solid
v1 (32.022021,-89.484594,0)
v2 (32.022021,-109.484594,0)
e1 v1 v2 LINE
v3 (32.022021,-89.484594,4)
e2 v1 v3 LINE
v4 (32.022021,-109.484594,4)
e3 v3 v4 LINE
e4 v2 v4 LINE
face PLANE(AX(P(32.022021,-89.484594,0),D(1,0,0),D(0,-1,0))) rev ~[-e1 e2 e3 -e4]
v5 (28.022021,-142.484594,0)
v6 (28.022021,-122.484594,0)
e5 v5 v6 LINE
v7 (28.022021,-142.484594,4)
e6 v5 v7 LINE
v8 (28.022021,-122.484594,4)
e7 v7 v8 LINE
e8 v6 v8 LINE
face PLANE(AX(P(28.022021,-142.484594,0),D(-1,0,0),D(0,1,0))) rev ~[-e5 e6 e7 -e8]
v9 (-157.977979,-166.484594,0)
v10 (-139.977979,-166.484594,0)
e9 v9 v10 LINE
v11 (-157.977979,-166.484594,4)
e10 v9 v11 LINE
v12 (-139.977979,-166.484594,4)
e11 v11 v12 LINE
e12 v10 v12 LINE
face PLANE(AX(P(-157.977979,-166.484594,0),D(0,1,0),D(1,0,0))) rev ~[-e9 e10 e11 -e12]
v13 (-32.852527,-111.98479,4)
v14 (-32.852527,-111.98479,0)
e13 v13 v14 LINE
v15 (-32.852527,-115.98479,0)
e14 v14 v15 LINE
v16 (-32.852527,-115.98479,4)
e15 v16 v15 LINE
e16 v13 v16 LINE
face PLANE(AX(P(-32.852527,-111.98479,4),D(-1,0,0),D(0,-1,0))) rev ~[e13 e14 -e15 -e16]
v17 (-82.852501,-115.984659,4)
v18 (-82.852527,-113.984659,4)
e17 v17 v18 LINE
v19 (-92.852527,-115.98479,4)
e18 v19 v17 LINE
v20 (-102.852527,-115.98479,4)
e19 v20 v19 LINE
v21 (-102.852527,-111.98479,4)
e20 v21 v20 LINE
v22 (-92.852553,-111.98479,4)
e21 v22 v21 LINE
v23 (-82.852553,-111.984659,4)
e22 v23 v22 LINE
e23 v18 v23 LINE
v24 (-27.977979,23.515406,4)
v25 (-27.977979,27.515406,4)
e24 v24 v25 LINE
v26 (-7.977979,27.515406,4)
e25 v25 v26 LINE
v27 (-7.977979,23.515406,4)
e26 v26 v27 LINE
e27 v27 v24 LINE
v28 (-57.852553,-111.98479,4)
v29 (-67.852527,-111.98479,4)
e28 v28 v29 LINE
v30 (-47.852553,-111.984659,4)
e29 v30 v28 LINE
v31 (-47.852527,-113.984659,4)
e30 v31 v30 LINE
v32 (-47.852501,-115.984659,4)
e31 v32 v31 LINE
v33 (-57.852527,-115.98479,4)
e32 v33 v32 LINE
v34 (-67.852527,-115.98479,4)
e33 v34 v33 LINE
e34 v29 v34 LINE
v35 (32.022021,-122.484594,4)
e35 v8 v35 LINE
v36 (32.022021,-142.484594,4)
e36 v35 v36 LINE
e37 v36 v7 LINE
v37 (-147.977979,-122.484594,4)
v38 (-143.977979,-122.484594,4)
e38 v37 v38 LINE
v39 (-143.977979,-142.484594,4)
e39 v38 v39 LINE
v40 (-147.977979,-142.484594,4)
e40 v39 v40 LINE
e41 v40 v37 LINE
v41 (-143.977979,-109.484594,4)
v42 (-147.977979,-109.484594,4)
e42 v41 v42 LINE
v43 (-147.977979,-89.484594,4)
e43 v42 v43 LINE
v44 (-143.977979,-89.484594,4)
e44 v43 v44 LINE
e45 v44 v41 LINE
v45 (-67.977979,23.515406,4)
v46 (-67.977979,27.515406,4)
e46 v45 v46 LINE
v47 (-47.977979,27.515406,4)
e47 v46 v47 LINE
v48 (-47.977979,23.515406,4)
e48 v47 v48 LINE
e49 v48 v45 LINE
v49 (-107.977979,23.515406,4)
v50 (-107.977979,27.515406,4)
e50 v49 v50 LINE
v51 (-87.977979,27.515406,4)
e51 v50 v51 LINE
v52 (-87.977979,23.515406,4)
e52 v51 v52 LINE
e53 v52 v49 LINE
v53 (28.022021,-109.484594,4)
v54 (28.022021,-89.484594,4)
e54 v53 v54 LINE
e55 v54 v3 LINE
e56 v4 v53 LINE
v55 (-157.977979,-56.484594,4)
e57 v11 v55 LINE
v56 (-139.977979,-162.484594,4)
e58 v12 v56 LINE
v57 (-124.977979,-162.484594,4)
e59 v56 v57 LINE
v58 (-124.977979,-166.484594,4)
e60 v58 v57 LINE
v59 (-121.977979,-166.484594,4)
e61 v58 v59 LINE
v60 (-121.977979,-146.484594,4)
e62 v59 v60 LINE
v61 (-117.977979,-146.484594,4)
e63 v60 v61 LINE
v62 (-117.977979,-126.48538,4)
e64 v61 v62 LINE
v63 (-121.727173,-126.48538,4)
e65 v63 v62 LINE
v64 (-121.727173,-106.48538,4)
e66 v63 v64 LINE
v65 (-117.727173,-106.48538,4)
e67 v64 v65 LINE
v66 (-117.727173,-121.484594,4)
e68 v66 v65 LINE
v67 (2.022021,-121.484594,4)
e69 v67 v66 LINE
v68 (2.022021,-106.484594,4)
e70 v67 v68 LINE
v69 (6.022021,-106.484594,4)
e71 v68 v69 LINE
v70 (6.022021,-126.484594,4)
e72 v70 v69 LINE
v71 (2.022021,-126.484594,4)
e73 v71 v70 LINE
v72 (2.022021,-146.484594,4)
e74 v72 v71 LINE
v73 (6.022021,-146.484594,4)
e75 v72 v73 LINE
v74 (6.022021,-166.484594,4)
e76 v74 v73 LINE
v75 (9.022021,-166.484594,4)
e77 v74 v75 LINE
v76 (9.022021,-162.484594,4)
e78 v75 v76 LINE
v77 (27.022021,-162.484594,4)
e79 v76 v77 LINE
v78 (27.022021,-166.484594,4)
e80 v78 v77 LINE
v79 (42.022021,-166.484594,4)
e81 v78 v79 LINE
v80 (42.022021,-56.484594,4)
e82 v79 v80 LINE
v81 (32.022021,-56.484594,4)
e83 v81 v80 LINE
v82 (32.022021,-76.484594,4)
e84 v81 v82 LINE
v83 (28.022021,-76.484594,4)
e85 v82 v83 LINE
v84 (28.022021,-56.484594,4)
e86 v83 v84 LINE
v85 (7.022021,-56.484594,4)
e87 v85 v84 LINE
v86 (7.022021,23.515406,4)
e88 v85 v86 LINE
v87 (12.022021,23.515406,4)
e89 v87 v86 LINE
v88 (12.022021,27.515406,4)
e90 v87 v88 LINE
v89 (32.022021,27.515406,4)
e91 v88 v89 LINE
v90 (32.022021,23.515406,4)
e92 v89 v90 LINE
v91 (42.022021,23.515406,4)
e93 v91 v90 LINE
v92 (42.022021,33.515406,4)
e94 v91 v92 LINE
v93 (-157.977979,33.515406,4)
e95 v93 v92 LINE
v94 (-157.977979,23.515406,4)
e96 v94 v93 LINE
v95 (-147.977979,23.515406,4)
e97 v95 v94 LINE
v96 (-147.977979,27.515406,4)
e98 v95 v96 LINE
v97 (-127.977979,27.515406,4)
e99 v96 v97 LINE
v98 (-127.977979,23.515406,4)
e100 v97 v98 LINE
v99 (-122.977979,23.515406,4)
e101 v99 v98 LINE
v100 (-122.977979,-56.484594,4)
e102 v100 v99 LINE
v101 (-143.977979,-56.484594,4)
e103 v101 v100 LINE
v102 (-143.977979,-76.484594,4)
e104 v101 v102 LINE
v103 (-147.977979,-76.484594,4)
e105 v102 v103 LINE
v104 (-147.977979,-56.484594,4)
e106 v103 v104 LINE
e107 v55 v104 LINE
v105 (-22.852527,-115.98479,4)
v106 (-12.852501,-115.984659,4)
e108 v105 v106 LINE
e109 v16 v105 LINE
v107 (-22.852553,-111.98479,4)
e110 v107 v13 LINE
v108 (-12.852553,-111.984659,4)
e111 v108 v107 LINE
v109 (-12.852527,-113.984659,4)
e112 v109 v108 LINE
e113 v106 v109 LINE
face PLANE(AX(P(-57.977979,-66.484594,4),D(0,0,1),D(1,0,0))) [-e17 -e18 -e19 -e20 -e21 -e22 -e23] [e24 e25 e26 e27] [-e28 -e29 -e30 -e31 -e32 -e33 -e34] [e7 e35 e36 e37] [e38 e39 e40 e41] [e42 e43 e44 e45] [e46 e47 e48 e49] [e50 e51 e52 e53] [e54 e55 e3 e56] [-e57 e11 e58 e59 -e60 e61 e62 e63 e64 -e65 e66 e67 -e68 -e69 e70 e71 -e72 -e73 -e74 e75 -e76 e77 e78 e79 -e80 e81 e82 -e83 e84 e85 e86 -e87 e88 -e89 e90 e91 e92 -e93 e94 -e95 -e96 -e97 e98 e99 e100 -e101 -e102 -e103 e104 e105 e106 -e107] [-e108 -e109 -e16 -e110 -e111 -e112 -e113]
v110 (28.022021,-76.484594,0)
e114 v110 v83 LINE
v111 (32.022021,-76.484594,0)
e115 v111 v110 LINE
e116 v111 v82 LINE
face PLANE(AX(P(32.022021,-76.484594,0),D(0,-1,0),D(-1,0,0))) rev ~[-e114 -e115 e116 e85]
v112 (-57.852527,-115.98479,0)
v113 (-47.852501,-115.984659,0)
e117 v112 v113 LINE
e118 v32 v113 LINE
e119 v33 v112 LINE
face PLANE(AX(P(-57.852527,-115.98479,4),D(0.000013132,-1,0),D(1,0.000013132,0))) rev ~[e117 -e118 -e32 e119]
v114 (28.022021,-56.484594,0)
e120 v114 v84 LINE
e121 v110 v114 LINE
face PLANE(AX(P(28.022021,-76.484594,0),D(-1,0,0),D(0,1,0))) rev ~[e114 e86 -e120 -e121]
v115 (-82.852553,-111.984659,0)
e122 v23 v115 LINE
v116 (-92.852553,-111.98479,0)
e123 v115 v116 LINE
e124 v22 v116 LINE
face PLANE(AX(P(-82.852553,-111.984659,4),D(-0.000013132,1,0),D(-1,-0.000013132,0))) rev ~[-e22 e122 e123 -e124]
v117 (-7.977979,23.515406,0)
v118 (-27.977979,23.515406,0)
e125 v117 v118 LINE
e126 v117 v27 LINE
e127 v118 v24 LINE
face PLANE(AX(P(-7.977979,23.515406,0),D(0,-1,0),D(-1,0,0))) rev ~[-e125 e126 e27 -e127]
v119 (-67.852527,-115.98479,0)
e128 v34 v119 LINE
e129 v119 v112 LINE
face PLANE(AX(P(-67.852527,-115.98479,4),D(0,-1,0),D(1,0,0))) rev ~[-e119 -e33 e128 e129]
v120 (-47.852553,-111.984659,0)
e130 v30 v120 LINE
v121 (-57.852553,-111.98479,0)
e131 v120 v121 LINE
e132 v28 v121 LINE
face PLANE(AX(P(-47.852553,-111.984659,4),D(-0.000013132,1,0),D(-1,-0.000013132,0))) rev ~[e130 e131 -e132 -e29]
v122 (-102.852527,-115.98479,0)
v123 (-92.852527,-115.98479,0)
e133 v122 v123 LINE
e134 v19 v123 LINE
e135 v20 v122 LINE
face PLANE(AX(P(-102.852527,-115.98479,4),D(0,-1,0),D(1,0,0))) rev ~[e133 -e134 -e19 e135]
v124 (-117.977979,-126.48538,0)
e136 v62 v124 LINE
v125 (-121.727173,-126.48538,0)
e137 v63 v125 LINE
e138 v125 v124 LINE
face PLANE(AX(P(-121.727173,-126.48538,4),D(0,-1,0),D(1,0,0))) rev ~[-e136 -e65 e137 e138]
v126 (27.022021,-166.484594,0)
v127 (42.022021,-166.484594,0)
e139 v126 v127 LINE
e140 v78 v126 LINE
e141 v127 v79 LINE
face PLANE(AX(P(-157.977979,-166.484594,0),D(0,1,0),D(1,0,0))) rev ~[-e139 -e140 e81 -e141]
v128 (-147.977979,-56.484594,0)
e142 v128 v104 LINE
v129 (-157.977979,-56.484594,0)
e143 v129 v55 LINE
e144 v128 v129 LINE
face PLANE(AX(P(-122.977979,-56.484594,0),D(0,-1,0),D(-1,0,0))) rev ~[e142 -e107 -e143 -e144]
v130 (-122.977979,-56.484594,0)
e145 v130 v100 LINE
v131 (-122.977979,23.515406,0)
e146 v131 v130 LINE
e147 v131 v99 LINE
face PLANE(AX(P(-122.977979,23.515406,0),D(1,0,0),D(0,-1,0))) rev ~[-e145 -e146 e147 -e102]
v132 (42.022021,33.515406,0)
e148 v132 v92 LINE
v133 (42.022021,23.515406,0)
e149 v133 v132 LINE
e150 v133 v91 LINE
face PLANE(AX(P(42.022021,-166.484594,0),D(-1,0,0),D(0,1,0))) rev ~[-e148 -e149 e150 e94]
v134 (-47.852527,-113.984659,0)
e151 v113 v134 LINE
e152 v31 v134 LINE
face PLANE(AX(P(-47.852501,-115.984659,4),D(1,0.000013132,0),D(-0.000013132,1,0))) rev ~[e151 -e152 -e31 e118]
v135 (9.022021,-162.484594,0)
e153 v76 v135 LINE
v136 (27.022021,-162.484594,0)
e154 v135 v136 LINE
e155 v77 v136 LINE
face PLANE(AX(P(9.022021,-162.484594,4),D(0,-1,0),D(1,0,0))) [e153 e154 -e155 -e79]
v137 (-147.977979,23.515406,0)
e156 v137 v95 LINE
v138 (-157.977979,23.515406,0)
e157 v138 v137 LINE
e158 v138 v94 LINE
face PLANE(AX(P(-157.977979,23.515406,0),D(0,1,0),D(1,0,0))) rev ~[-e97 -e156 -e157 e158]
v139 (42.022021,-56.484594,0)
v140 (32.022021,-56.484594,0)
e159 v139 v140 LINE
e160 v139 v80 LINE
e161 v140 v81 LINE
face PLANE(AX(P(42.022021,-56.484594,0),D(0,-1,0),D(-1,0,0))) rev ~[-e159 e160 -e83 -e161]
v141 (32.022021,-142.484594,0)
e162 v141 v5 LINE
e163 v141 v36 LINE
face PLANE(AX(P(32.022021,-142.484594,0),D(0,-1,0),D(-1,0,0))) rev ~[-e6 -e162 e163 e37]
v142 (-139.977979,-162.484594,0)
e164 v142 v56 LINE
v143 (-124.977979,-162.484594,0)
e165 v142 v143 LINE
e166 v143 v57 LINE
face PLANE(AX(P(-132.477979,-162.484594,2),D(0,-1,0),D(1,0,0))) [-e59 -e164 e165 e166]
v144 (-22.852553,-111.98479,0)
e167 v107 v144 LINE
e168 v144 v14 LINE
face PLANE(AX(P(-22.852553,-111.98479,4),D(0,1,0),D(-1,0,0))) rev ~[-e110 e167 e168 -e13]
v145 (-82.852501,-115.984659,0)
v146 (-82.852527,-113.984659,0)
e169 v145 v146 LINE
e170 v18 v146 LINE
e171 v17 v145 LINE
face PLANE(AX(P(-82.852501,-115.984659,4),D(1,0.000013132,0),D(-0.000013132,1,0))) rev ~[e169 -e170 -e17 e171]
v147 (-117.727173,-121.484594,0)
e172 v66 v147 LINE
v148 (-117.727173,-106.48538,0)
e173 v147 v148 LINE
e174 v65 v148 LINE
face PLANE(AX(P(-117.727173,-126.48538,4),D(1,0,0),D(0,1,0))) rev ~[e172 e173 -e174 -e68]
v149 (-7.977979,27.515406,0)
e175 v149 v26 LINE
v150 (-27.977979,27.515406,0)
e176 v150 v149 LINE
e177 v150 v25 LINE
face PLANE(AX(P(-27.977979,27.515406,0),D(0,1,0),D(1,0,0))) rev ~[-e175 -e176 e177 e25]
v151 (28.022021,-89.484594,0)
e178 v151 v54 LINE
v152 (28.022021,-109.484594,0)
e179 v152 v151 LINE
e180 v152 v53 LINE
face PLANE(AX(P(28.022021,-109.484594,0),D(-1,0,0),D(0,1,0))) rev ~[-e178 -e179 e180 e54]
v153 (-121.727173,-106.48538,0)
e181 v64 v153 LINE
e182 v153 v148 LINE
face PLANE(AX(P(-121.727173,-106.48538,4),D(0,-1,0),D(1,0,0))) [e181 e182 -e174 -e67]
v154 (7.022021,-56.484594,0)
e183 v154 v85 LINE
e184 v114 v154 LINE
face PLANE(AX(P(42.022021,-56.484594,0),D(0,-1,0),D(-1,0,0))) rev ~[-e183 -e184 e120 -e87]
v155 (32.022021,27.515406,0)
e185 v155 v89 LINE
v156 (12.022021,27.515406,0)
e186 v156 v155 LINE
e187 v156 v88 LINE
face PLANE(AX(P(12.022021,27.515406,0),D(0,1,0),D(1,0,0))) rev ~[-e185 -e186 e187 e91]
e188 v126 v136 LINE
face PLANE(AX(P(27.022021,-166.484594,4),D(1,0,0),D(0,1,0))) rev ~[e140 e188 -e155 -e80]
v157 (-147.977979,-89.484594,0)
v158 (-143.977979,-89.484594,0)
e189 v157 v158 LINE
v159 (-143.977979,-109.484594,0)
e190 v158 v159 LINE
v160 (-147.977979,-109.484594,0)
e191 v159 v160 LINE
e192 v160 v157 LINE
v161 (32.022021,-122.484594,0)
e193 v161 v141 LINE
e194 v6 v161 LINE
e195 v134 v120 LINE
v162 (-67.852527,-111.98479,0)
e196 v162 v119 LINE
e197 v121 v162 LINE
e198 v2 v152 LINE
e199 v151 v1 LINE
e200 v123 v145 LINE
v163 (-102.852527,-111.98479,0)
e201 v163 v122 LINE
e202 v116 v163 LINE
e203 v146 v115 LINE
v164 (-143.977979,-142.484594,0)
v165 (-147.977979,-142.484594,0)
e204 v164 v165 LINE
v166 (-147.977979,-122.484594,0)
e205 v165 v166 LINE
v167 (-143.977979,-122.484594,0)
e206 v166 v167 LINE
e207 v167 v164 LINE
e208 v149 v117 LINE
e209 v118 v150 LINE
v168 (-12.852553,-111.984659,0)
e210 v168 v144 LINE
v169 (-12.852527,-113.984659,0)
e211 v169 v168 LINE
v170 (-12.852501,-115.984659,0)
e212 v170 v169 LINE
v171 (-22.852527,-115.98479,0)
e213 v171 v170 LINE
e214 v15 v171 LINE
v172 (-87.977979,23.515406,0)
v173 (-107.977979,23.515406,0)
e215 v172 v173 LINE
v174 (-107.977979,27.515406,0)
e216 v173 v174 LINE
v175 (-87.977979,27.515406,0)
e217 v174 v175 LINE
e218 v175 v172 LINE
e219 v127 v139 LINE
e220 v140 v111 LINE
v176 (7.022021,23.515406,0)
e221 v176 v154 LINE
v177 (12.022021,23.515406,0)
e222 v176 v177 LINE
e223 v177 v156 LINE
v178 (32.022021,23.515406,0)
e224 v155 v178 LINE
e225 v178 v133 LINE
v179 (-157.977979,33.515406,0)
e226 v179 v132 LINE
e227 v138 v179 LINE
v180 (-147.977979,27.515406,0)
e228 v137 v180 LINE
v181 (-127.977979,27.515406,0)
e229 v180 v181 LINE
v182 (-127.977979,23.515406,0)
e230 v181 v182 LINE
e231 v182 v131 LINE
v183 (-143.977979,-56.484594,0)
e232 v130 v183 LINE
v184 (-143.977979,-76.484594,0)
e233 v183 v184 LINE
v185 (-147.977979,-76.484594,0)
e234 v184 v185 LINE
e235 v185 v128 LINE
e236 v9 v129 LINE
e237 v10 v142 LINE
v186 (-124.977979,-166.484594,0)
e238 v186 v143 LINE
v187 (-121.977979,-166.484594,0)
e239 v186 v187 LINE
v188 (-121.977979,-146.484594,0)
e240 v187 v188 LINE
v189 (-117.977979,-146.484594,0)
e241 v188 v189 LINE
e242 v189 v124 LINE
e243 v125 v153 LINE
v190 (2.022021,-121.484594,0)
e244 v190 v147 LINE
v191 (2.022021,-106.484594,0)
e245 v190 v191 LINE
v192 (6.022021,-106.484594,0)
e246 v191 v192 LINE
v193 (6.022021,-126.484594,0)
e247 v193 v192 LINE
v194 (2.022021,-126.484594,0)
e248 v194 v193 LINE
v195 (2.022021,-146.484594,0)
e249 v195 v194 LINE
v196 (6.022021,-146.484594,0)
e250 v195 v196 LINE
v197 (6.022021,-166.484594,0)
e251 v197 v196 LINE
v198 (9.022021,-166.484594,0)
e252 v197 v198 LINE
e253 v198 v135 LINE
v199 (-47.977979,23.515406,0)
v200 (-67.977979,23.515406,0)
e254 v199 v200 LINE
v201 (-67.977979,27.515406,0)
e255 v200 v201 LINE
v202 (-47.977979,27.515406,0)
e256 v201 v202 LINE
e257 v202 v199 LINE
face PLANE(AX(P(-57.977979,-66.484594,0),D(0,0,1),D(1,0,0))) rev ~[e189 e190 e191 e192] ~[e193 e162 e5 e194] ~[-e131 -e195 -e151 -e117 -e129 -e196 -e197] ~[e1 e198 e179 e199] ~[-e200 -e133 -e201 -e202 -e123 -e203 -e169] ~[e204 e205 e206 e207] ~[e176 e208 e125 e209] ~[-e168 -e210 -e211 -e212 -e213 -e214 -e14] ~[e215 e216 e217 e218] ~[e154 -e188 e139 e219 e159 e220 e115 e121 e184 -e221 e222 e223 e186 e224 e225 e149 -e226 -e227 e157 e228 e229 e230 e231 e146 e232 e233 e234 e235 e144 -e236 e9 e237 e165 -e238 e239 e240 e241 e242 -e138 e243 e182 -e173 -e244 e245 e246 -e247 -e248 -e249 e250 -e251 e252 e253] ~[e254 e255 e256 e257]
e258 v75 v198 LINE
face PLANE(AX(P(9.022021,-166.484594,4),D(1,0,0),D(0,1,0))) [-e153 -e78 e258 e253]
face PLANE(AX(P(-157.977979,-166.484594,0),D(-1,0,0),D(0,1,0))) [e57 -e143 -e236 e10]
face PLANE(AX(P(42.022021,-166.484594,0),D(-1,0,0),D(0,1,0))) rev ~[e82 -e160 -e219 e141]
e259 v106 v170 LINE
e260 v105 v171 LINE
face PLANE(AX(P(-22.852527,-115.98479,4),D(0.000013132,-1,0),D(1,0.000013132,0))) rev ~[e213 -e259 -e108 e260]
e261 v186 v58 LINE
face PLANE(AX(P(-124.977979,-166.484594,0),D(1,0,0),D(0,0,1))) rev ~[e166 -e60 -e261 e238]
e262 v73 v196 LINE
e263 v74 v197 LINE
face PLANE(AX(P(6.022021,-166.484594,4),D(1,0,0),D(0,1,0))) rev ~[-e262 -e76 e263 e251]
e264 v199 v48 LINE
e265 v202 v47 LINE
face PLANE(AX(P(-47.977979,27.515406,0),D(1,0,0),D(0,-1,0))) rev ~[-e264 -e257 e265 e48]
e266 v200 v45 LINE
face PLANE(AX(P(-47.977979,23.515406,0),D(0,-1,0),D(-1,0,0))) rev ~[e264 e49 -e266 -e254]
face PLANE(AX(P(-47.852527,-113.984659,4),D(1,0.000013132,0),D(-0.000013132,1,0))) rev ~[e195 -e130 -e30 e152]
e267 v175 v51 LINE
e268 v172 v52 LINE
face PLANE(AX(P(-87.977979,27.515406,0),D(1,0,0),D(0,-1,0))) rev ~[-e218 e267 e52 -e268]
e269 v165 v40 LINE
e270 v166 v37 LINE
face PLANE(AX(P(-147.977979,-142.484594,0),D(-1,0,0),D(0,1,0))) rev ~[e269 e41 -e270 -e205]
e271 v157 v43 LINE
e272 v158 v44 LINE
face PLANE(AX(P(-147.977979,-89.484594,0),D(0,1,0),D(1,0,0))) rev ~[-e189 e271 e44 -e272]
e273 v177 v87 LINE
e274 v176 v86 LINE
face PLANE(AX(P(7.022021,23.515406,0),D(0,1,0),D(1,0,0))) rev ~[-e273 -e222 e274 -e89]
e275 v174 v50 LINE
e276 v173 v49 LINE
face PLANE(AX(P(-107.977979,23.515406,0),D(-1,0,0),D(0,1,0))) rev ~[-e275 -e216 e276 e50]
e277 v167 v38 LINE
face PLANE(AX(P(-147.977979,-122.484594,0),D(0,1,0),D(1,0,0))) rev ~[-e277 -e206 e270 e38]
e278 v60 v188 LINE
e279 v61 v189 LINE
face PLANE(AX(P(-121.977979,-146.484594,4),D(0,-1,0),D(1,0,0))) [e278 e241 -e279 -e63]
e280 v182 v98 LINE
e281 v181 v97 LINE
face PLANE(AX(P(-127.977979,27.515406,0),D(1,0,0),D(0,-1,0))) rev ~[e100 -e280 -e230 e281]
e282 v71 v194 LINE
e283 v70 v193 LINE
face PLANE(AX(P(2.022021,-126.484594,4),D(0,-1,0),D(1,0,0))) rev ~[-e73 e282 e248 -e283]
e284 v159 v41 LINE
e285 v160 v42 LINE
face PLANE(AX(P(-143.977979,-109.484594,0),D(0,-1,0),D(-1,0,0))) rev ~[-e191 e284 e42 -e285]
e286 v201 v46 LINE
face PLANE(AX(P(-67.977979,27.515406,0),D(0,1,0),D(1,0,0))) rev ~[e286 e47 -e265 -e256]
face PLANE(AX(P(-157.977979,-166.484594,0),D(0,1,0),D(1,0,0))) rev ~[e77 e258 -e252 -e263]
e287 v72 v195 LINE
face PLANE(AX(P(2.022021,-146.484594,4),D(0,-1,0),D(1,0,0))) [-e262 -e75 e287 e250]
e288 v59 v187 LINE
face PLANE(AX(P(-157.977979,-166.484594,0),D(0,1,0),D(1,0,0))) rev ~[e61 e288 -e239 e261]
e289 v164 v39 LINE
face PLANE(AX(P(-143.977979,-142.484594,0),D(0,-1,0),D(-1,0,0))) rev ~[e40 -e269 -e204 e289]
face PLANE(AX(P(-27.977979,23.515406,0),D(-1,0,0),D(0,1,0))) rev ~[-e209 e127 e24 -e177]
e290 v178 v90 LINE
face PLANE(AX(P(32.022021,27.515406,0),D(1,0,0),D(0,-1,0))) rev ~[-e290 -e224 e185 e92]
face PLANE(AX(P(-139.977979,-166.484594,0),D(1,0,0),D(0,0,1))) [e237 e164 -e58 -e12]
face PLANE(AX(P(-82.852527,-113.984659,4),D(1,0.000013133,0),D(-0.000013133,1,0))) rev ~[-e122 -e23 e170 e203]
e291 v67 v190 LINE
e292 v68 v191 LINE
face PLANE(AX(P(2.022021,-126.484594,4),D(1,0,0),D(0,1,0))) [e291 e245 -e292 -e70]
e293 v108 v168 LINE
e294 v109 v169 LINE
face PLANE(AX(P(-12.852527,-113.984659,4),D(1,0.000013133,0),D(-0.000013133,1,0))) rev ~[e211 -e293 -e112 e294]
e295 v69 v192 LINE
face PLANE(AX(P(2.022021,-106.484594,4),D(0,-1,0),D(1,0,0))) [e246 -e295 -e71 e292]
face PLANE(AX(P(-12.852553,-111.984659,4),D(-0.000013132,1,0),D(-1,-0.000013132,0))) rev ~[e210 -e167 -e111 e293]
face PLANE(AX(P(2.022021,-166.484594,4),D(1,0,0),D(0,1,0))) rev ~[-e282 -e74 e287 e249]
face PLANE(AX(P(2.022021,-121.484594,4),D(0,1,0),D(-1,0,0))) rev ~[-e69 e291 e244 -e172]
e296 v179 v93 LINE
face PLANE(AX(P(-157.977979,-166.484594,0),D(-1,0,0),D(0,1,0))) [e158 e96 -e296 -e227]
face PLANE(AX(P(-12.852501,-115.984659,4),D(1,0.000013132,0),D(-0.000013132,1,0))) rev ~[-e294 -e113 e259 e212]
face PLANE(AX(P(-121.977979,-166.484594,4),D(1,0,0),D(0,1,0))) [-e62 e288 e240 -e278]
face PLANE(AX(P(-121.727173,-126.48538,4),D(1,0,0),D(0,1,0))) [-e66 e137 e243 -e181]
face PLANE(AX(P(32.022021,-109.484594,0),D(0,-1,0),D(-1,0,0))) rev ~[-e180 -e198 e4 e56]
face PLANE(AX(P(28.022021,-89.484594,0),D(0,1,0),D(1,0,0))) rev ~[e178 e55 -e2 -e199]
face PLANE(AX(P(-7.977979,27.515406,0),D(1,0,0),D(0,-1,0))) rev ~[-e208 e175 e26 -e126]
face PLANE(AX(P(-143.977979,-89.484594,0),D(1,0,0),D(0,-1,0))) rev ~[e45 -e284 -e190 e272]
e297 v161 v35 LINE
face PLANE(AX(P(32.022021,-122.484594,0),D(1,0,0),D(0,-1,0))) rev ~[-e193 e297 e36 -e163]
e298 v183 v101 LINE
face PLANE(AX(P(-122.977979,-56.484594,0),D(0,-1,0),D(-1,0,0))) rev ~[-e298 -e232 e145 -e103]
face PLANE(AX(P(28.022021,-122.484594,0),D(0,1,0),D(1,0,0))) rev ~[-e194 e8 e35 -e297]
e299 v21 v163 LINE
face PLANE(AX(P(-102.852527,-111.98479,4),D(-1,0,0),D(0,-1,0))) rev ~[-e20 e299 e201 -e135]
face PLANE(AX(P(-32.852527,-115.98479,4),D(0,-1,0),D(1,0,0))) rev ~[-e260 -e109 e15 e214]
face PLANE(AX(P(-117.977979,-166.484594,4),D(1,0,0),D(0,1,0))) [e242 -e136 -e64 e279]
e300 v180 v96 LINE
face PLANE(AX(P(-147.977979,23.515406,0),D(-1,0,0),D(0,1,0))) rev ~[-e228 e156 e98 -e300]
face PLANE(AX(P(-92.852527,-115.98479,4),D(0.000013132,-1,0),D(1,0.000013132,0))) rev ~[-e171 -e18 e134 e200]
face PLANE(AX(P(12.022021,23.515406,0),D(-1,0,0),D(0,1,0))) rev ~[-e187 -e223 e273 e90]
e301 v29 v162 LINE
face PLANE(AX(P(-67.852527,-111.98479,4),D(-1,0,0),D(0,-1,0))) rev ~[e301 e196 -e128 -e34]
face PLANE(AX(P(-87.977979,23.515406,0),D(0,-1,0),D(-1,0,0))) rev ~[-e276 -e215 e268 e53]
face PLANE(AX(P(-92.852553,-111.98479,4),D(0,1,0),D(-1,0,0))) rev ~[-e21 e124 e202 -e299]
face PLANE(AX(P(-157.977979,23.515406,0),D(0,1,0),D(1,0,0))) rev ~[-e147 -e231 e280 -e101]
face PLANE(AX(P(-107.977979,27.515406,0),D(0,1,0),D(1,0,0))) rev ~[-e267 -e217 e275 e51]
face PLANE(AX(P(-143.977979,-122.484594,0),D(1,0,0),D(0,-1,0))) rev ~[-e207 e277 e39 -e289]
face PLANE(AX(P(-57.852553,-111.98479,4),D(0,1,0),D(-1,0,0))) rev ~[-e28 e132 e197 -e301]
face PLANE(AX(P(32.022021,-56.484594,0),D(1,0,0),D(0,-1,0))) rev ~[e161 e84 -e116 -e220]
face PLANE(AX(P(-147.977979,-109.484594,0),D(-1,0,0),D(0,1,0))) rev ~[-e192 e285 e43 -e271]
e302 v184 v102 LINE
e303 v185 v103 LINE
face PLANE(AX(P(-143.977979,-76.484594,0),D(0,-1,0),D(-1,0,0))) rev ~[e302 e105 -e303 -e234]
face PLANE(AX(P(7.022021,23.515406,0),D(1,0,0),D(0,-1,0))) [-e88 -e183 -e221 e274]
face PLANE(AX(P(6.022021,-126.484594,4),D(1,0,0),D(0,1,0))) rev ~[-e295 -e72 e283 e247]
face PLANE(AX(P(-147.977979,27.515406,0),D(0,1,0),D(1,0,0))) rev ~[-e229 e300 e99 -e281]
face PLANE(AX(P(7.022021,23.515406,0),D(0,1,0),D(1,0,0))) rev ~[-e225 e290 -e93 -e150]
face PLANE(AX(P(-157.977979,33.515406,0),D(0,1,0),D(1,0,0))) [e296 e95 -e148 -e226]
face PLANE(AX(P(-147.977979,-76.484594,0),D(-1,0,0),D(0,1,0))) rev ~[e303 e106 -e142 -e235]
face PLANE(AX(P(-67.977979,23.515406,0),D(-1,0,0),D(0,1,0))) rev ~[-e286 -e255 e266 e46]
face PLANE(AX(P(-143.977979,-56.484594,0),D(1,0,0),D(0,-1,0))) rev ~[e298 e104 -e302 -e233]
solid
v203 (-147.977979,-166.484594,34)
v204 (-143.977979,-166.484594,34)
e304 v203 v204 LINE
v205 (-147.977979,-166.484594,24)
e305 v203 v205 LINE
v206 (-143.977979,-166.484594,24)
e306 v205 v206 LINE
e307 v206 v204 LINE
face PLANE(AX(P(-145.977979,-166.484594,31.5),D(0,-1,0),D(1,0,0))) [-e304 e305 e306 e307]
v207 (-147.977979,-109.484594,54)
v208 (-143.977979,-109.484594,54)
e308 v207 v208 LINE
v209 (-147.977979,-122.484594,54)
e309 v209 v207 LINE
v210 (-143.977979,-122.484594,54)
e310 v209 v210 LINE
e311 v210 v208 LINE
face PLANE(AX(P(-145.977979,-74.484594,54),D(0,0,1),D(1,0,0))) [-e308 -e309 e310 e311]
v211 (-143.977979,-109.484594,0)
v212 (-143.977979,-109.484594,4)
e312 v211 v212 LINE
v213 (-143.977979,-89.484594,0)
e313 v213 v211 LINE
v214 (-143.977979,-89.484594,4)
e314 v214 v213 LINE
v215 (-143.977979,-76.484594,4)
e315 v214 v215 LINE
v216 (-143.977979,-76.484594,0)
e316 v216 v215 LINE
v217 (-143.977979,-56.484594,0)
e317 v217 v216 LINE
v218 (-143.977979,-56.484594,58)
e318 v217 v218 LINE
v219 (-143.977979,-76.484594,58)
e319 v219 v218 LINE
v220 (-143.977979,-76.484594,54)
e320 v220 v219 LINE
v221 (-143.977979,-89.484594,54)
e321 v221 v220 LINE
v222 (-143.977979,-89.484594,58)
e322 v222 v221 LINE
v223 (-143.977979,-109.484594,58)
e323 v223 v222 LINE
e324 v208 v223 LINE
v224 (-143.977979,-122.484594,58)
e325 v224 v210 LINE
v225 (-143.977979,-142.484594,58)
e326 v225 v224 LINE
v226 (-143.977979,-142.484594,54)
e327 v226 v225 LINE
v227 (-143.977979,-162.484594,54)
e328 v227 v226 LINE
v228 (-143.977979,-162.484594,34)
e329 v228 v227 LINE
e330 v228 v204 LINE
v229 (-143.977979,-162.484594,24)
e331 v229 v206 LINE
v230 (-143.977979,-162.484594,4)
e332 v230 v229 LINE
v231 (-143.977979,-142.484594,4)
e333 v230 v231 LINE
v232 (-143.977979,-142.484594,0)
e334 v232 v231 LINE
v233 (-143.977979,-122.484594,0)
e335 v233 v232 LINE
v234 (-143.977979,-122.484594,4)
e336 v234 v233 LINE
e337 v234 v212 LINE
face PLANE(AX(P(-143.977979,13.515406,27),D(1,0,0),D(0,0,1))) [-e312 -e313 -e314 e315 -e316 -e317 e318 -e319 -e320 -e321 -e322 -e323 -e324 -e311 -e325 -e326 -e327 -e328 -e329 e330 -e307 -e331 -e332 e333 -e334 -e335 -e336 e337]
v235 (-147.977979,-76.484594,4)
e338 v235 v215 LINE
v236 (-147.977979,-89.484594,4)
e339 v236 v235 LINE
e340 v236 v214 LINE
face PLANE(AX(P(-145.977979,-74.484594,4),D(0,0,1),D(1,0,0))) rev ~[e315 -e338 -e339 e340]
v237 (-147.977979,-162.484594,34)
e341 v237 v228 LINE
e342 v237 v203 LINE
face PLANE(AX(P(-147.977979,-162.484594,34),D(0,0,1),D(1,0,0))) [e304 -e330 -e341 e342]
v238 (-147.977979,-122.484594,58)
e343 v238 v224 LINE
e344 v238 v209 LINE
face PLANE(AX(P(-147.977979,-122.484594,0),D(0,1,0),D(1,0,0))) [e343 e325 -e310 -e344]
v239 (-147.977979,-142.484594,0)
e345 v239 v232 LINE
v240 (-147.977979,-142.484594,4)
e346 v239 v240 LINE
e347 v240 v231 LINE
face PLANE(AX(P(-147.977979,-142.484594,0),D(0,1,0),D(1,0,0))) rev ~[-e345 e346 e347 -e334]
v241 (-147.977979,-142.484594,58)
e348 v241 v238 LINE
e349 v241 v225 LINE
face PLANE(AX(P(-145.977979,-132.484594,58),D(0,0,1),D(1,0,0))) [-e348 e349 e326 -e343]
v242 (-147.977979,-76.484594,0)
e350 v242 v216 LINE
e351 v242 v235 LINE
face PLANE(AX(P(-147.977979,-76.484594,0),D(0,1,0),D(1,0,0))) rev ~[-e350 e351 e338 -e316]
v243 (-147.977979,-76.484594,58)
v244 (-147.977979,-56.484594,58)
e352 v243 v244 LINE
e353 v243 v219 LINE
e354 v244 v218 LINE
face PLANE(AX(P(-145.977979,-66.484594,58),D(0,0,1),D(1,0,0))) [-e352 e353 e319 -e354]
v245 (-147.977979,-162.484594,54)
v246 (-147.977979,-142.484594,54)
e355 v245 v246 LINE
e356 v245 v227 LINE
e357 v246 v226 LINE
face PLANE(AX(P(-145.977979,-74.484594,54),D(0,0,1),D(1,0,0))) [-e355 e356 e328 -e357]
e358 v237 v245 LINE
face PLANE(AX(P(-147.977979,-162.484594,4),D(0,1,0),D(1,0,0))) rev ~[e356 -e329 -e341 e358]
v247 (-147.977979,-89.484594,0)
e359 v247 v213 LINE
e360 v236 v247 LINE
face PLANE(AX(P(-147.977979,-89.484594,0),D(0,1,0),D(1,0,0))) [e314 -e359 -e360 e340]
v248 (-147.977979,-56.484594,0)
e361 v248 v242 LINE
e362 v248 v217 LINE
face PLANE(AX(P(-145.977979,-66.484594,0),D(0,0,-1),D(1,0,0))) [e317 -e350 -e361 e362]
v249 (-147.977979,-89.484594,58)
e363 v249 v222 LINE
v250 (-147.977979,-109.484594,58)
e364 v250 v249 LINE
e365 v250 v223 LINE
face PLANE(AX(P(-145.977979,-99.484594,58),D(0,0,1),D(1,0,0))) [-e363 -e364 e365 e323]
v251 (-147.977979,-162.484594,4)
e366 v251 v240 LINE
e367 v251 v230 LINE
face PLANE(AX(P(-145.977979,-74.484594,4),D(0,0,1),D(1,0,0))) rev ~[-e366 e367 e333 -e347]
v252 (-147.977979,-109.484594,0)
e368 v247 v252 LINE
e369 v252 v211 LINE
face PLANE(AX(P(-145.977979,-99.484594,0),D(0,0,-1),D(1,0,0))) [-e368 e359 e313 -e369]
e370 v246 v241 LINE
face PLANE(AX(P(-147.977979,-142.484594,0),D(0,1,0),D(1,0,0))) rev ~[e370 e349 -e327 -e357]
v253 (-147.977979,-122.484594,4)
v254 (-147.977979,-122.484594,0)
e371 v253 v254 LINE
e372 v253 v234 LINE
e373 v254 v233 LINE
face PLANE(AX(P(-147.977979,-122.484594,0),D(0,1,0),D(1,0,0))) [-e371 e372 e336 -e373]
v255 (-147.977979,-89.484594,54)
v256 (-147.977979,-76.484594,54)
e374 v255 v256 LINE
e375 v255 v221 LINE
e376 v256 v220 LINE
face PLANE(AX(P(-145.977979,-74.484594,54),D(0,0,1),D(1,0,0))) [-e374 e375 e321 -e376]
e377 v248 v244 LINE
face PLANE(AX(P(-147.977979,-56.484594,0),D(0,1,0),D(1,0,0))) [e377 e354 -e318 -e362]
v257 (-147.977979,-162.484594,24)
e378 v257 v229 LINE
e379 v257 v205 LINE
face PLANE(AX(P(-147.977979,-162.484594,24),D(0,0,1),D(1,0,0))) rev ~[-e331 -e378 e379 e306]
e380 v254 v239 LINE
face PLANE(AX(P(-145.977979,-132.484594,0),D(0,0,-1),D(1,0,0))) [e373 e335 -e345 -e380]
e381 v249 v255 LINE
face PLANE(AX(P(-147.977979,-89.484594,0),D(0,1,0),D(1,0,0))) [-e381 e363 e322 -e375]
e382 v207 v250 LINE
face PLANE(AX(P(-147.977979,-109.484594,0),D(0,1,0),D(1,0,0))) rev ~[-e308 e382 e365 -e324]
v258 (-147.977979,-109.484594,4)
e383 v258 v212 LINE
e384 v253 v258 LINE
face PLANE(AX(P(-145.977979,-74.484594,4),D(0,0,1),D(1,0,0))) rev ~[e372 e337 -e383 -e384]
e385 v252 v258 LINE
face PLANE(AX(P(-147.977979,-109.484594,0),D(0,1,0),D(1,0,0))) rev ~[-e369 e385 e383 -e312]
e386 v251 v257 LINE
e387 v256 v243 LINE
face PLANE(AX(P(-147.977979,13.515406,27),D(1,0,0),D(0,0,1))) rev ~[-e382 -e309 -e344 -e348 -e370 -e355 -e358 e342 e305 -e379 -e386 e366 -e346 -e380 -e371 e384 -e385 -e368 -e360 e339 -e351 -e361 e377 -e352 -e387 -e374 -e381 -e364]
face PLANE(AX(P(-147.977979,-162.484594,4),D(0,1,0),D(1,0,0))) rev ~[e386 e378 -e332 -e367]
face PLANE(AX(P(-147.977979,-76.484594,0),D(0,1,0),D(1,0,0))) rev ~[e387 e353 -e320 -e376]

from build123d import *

# Parameters (mm, degrees)
F0_W      = 200
F0_H      = 200
F1_DEPTH  = 4
F2_W      = 4
F2_H      = 20
F3_DEPTH  = 54
F4_W      = 60
F4_H      = 45
F5_DEPTH  = 25
F6_W      = 4
F6_H      = 20
F7_DEPTH  = 4
F11_W     = 4
F11_H     = 176
F12_DEPTH = 50
F13_W     = 70
F13_H     = 23
F14_DEPTH = 4
F15_W     = 4
F15_H     = 5
F16_DEPTH = 4
F17_W     = 15
F17_H     = 4
F18_DEPTH = 4
F19_W     = 4
F19_H     = 20
F20_DEPTH = 4
F21_W     = 18
F21_H     = 4
F21_W_2   = 4
F21_H_2   = 20
F22_DEPTH = 4
F25_DEPTH = 4
F26_W     = 4
F26_H     = 31
F27_DEPTH = 10
F28_W     = 10
F28_H     = 80
F28_W_2   = 25
F29_DEPTH = 25
F30_W     = 80
F30_H     = 31
F31_DEPTH = 25


# Not quite as in the source:
# - ends of sketch curves that miss each other by under 0.0002 mm in the source are joined


with BuildPart() as f1:
    # F0 (on Top) → F1 (new body)
    with BuildSketch(Plane.XY):
        with Locations((-57.977979065, -66.4845939098)):
            Rectangle(F0_W, F0_H)
        Polygon((-143.977979065, -122.4845939098), (-143.977979065, -132.4845939098), (-143.977979065, -142.4845939098), (-147.977979065, -142.4845939098), (-147.977979065, -132.4845939098), (-147.977979065, -122.4845939098), align=None, mode=Mode.SUBTRACT)
        Polygon((-147.977979065, -109.4845939098), (-147.977979065, -99.4845939098), (-147.977979065, -89.4845939098), (-143.977979065, -89.4845939098), (-143.977979065, -99.4845939098), (-143.977979065, -109.4845939098), align=None, mode=Mode.SUBTRACT)
        Polygon((-147.977979065, -66.4845939098), (-147.977979065, -56.4845939098), (-143.977979065, -56.4845939098), (-143.977979065, -66.4845939098), (-143.977979065, -76.4845939098), (-147.977979065, -76.4845939098), align=None, mode=Mode.SUBTRACT)
        Polygon((32.022020935, -122.4845939098), (32.022020935, -132.4845939098), (32.022020935, -142.4845939098), (28.022020935, -142.4845939098), (28.022020935, -132.4845939098), (28.022020935, -122.4845939098), align=None, mode=Mode.SUBTRACT)
        Polygon((32.022020935, -89.4845939098), (32.022020935, -99.4845939098), (32.022020935, -109.4845939098), (28.022020935, -109.4845939098), (28.022020935, -99.4845939098), (28.022020935, -89.4845939098), align=None, mode=Mode.SUBTRACT)
        Polygon((-127.977979065, 23.5154060902), (-137.977979065, 23.5154060902), (-147.977979065, 23.5154060902), (-147.977979065, 27.5154060902), (-137.977979065, 27.5154060902), (-127.977979065, 27.5154060902), align=None, mode=Mode.SUBTRACT)
        Polygon((-87.977979065, 23.5154060902), (-97.977979065, 23.5154060902), (-107.977979065, 23.5154060902), (-107.977979065, 27.5154060902), (-97.977979065, 27.5154060902), (-87.977979065, 27.5154060902), align=None, mode=Mode.SUBTRACT)
        Polygon((32.022020935, -66.4845939098), (32.022020935, -76.4845939098), (28.022020935, -76.4845939098), (28.022020935, -66.4845939098), (28.022020935, -56.4845939098), (32.022020935, -56.4845939098), align=None, mode=Mode.SUBTRACT)
        Polygon((-47.977979065, 23.5154060902), (-57.977979065, 23.5154060902), (-67.977979065, 23.5154060902), (-67.977979065, 27.5154060902), (-57.977979065, 27.5154060902), (-47.977979065, 27.5154060902), align=None, mode=Mode.SUBTRACT)
        Polygon((-7.977979065, 23.5154060902), (-17.977979065, 23.5154060902), (-27.977979065, 23.5154060902), (-27.977979065, 27.5154060902), (-17.977979065, 27.5154060902), (-7.977979065, 27.5154060902), align=None, mode=Mode.SUBTRACT)
        Polygon((32.022020935, 23.5154060902), (22.022020935, 23.5154060902), (12.022020935, 23.5154060902), (12.022020935, 27.5154060902), (22.022020935, 27.5154060902), (32.022020935, 27.5154060902), align=None, mode=Mode.SUBTRACT)
    extrude(amount=F1_DEPTH)

    # F4 (on face) → F5 (cut)
    with BuildSketch(Plane.XY.offset(4)):
        with Locations((-87.977979065, -143.9845939098)):
            Rectangle(F4_W, F4_H)
        with Locations((-27.977979065, -143.9845939098)):
            Rectangle(F4_W, F4_H)
    extrude(amount=-F5_DEPTH, mode=Mode.SUBTRACT)

    # F17 (on face) → F18 (cut)
    with BuildSketch(Plane.XZ.offset(166.4845939098)):
        with Locations((-132.477979065, 2)):
            Rectangle(F17_W, F17_H)
    extrude(amount=-F18_DEPTH, mode=Mode.SUBTRACT)

    # F19 (on face) → F20 (cut)
    with BuildSketch(Plane.XY.offset(4)):
        with Locations((-119.977979065, -156.4845939098)):
            Rectangle(F19_W, F19_H)
        with Locations((-119.7271731991, -116.4853802123)):
            Rectangle(F19_W, F19_H)
    extrude(amount=-F20_DEPTH, mode=Mode.SUBTRACT)

    # F21 (on face) → F22 (cut)
    with BuildSketch(Plane.XY.offset(4)):
        with Locations((18.022020935, -164.4845939098)):
            Rectangle(F21_W, F21_H)
        with Locations((4.022020935, -156.4845939098)):
            Rectangle(F21_W_2, F21_H_2)
        with Locations((4.022020935, -116.4845939098)):
            Rectangle(F21_W_2, F21_H_2)
    extrude(amount=-F22_DEPTH, mode=Mode.SUBTRACT)

    # F24 (on face) → F25 (cut, through all)
    with BuildSketch(Plane.XY.offset(4)):
        Polygon((-47.8525531523, -111.9846591607), (-57.8525531515, -111.9847904856), (-67.8525268865, -111.9847904854), (-67.8525268865, -113.9847904854), (-67.8525268865, -115.9847904854), (-57.8525268865, -115.9847904854), (-47.8525006224, -115.9846591603), (-47.8525268873, -113.9846591605), align=None)
        Polygon((-32.8525268865, -111.9847904854), (-32.8525268865, -113.9847904854), (-32.8525268865, -115.9847904854), (-22.8525268865, -115.9847904854), (-12.8525006224, -115.9846591603), (-12.8525268873, -113.9846591605), (-12.8525531523, -111.9846591607), (-22.8525531515, -111.9847904856), align=None)
        Polygon((-102.8525268865, -115.9847904854), (-92.8525268865, -115.9847904854), (-82.8525006224, -115.9846591603), (-82.8525268873, -113.9846591605), (-82.8525531523, -111.9846591607), (-92.8525531515, -111.9847904856), (-102.8525268865, -111.9847904854), (-102.8525268865, -113.9847904854), align=None)
    extrude(amount=-F25_DEPTH, mode=Mode.SUBTRACT)

    # F28 (on face) → F29 (cut)
    with BuildSketch(Plane(origin=(0, 0, 0), x_dir=(1, 0, 0), z_dir=(0, 0, -1))):
        with Locations((-152.977979065, 16.4845939098)):
            Rectangle(F28_W, F28_H)
        with Locations((-135.477979065, 16.4845939098)):
            Rectangle(F28_W_2, F28_H)
        with Locations((37.022020935, 16.4845939098)):
            Rectangle(F28_W, F28_H)
        with Locations((19.522020935, 16.4845939098)):
            Rectangle(F28_W_2, F28_H)
    extrude(amount=-F29_DEPTH, mode=Mode.SUBTRACT)


with BuildPart() as f3:
    # F2 (on face) → F3 (new body)
    with BuildSketch(Plane.XY.offset(4)):
        with Locations((-145.977979065, -66.4845939098)):
            Rectangle(F2_W, F2_H)
    extrude(amount=F3_DEPTH)

    # F6 (on face) → F7 (join)
    with BuildSketch(Plane(origin=(0, 0, 0), x_dir=(1, 0, 0), z_dir=(0, 0, -1))):
        with Locations((-145.977979065, 66.4845939098)):
            Rectangle(F6_W, F6_H)
    extrude(amount=-F7_DEPTH)

    # F10: union 



with BuildPart() as f3b:
    # F2 (on face) → F3, piece 2 (new body)
    with BuildSketch(Plane.XY.offset(4)):
        with Locations((-145.977979065, -31.4845939098)):
            Rectangle(F2_W, F2_H)
    extrude(amount=F3_DEPTH)


with BuildPart() as f3c:
    # F2 (on face) → F3, piece 3 (new body)
    with BuildSketch(Plane.XY.offset(4)):
        with Locations((-145.977979065, 3.5154060902)):
            Rectangle(F2_W, F2_H)
    extrude(amount=F3_DEPTH)


with BuildPart() as f3d:
    # F2 (on face) → F3, piece 4 (new body)
    with BuildSketch(Plane.XY.offset(4)):
        with Locations((-145.977979065, -99.4845939098)):
            Rectangle(F2_W, F2_H)
    extrude(amount=F3_DEPTH)

    # F6 (on face) → F7, piece 2 (join)
    with BuildSketch(Plane(origin=(0, 0, 0), x_dir=(1, 0, 0), z_dir=(0, 0, -1))):
        with Locations((-145.977979065, 99.4845939098)):
            Rectangle(F6_W, F6_H)
    extrude(amount=-F7_DEPTH)

    # F8: union 


with BuildPart() as f3e:
    # F2 (on face) → F3, piece 5 (new body)
    with BuildSketch(Plane.XY.offset(4)):
        with Locations((-145.977979065, -132.4845939098)):
            Rectangle(F2_W, F2_H)
    extrude(amount=F3_DEPTH)

    # F6 (on face) → F7, piece 3 (join)
    with BuildSketch(Plane(origin=(0, 0, 0), x_dir=(1, 0, 0), z_dir=(0, 0, -1))):
        with Locations((-145.977979065, 132.4845939098)):
            Rectangle(F6_W, F6_H)
    extrude(amount=-F7_DEPTH)

    # F9: union 


with BuildPart() as f3_1:
    add(f3.part)

    add(f3b.part)  # F12 merges F3b

    add(f3c.part)  # F12 merges F3c

    add(f3d.part)  # F12 merges F3d

    add(f3e.part)  # F12 merges F3e
    # F11 (on face) → F12 (join)
    with BuildSketch(Plane.XY.offset(4)):
        with Locations((-145.977979065, -74.4845939098)):
            Rectangle(F11_W, F11_H)
    extrude(amount=F12_DEPTH)

    # F13 (on face) → F14 (cut, through all)
    with BuildSketch(Plane(origin=(-147.977979065, 0, 0), x_dir=(0, -1, 0), z_dir=(-1, 0, 0))):
        with Locations((21.4845939098, 15.5)):
            Rectangle(F13_W, F13_H)
    extrude(amount=-F14_DEPTH, mode=Mode.SUBTRACT)

    # F15 (on face) → F16 (join)
    with BuildSketch(Plane.XZ.offset(162.4845939098)):
        with Locations((-145.977979065, 31.5)):
            Rectangle(F15_W, F15_H)
        with Locations((-145.977979065, 26.5)):
            Rectangle(F15_W, F15_H)
    extrude(amount=F16_DEPTH)

    # F26 (on face) → F27 (join)
    with BuildSketch(Plane(origin=(0, 13.5154060902, 0), x_dir=(-1, 0, 0), z_dir=(0, 1, 0))):
        with Locations((145.977979065, 42.5)):
            Rectangle(F26_W, F26_H)
    extrude(amount=F27_DEPTH)

    # F30 (on face) → F31 (cut)
    with BuildSketch(Plane.YZ.offset(-143.977979065)):
        with Locations((-16.4845939098, 42.5)):
            Rectangle(F30_W, F30_H)
    extrude(amount=-F31_DEPTH, mode=Mode.SUBTRACT)


solid = Compound([f1.part, f3_1.part])
